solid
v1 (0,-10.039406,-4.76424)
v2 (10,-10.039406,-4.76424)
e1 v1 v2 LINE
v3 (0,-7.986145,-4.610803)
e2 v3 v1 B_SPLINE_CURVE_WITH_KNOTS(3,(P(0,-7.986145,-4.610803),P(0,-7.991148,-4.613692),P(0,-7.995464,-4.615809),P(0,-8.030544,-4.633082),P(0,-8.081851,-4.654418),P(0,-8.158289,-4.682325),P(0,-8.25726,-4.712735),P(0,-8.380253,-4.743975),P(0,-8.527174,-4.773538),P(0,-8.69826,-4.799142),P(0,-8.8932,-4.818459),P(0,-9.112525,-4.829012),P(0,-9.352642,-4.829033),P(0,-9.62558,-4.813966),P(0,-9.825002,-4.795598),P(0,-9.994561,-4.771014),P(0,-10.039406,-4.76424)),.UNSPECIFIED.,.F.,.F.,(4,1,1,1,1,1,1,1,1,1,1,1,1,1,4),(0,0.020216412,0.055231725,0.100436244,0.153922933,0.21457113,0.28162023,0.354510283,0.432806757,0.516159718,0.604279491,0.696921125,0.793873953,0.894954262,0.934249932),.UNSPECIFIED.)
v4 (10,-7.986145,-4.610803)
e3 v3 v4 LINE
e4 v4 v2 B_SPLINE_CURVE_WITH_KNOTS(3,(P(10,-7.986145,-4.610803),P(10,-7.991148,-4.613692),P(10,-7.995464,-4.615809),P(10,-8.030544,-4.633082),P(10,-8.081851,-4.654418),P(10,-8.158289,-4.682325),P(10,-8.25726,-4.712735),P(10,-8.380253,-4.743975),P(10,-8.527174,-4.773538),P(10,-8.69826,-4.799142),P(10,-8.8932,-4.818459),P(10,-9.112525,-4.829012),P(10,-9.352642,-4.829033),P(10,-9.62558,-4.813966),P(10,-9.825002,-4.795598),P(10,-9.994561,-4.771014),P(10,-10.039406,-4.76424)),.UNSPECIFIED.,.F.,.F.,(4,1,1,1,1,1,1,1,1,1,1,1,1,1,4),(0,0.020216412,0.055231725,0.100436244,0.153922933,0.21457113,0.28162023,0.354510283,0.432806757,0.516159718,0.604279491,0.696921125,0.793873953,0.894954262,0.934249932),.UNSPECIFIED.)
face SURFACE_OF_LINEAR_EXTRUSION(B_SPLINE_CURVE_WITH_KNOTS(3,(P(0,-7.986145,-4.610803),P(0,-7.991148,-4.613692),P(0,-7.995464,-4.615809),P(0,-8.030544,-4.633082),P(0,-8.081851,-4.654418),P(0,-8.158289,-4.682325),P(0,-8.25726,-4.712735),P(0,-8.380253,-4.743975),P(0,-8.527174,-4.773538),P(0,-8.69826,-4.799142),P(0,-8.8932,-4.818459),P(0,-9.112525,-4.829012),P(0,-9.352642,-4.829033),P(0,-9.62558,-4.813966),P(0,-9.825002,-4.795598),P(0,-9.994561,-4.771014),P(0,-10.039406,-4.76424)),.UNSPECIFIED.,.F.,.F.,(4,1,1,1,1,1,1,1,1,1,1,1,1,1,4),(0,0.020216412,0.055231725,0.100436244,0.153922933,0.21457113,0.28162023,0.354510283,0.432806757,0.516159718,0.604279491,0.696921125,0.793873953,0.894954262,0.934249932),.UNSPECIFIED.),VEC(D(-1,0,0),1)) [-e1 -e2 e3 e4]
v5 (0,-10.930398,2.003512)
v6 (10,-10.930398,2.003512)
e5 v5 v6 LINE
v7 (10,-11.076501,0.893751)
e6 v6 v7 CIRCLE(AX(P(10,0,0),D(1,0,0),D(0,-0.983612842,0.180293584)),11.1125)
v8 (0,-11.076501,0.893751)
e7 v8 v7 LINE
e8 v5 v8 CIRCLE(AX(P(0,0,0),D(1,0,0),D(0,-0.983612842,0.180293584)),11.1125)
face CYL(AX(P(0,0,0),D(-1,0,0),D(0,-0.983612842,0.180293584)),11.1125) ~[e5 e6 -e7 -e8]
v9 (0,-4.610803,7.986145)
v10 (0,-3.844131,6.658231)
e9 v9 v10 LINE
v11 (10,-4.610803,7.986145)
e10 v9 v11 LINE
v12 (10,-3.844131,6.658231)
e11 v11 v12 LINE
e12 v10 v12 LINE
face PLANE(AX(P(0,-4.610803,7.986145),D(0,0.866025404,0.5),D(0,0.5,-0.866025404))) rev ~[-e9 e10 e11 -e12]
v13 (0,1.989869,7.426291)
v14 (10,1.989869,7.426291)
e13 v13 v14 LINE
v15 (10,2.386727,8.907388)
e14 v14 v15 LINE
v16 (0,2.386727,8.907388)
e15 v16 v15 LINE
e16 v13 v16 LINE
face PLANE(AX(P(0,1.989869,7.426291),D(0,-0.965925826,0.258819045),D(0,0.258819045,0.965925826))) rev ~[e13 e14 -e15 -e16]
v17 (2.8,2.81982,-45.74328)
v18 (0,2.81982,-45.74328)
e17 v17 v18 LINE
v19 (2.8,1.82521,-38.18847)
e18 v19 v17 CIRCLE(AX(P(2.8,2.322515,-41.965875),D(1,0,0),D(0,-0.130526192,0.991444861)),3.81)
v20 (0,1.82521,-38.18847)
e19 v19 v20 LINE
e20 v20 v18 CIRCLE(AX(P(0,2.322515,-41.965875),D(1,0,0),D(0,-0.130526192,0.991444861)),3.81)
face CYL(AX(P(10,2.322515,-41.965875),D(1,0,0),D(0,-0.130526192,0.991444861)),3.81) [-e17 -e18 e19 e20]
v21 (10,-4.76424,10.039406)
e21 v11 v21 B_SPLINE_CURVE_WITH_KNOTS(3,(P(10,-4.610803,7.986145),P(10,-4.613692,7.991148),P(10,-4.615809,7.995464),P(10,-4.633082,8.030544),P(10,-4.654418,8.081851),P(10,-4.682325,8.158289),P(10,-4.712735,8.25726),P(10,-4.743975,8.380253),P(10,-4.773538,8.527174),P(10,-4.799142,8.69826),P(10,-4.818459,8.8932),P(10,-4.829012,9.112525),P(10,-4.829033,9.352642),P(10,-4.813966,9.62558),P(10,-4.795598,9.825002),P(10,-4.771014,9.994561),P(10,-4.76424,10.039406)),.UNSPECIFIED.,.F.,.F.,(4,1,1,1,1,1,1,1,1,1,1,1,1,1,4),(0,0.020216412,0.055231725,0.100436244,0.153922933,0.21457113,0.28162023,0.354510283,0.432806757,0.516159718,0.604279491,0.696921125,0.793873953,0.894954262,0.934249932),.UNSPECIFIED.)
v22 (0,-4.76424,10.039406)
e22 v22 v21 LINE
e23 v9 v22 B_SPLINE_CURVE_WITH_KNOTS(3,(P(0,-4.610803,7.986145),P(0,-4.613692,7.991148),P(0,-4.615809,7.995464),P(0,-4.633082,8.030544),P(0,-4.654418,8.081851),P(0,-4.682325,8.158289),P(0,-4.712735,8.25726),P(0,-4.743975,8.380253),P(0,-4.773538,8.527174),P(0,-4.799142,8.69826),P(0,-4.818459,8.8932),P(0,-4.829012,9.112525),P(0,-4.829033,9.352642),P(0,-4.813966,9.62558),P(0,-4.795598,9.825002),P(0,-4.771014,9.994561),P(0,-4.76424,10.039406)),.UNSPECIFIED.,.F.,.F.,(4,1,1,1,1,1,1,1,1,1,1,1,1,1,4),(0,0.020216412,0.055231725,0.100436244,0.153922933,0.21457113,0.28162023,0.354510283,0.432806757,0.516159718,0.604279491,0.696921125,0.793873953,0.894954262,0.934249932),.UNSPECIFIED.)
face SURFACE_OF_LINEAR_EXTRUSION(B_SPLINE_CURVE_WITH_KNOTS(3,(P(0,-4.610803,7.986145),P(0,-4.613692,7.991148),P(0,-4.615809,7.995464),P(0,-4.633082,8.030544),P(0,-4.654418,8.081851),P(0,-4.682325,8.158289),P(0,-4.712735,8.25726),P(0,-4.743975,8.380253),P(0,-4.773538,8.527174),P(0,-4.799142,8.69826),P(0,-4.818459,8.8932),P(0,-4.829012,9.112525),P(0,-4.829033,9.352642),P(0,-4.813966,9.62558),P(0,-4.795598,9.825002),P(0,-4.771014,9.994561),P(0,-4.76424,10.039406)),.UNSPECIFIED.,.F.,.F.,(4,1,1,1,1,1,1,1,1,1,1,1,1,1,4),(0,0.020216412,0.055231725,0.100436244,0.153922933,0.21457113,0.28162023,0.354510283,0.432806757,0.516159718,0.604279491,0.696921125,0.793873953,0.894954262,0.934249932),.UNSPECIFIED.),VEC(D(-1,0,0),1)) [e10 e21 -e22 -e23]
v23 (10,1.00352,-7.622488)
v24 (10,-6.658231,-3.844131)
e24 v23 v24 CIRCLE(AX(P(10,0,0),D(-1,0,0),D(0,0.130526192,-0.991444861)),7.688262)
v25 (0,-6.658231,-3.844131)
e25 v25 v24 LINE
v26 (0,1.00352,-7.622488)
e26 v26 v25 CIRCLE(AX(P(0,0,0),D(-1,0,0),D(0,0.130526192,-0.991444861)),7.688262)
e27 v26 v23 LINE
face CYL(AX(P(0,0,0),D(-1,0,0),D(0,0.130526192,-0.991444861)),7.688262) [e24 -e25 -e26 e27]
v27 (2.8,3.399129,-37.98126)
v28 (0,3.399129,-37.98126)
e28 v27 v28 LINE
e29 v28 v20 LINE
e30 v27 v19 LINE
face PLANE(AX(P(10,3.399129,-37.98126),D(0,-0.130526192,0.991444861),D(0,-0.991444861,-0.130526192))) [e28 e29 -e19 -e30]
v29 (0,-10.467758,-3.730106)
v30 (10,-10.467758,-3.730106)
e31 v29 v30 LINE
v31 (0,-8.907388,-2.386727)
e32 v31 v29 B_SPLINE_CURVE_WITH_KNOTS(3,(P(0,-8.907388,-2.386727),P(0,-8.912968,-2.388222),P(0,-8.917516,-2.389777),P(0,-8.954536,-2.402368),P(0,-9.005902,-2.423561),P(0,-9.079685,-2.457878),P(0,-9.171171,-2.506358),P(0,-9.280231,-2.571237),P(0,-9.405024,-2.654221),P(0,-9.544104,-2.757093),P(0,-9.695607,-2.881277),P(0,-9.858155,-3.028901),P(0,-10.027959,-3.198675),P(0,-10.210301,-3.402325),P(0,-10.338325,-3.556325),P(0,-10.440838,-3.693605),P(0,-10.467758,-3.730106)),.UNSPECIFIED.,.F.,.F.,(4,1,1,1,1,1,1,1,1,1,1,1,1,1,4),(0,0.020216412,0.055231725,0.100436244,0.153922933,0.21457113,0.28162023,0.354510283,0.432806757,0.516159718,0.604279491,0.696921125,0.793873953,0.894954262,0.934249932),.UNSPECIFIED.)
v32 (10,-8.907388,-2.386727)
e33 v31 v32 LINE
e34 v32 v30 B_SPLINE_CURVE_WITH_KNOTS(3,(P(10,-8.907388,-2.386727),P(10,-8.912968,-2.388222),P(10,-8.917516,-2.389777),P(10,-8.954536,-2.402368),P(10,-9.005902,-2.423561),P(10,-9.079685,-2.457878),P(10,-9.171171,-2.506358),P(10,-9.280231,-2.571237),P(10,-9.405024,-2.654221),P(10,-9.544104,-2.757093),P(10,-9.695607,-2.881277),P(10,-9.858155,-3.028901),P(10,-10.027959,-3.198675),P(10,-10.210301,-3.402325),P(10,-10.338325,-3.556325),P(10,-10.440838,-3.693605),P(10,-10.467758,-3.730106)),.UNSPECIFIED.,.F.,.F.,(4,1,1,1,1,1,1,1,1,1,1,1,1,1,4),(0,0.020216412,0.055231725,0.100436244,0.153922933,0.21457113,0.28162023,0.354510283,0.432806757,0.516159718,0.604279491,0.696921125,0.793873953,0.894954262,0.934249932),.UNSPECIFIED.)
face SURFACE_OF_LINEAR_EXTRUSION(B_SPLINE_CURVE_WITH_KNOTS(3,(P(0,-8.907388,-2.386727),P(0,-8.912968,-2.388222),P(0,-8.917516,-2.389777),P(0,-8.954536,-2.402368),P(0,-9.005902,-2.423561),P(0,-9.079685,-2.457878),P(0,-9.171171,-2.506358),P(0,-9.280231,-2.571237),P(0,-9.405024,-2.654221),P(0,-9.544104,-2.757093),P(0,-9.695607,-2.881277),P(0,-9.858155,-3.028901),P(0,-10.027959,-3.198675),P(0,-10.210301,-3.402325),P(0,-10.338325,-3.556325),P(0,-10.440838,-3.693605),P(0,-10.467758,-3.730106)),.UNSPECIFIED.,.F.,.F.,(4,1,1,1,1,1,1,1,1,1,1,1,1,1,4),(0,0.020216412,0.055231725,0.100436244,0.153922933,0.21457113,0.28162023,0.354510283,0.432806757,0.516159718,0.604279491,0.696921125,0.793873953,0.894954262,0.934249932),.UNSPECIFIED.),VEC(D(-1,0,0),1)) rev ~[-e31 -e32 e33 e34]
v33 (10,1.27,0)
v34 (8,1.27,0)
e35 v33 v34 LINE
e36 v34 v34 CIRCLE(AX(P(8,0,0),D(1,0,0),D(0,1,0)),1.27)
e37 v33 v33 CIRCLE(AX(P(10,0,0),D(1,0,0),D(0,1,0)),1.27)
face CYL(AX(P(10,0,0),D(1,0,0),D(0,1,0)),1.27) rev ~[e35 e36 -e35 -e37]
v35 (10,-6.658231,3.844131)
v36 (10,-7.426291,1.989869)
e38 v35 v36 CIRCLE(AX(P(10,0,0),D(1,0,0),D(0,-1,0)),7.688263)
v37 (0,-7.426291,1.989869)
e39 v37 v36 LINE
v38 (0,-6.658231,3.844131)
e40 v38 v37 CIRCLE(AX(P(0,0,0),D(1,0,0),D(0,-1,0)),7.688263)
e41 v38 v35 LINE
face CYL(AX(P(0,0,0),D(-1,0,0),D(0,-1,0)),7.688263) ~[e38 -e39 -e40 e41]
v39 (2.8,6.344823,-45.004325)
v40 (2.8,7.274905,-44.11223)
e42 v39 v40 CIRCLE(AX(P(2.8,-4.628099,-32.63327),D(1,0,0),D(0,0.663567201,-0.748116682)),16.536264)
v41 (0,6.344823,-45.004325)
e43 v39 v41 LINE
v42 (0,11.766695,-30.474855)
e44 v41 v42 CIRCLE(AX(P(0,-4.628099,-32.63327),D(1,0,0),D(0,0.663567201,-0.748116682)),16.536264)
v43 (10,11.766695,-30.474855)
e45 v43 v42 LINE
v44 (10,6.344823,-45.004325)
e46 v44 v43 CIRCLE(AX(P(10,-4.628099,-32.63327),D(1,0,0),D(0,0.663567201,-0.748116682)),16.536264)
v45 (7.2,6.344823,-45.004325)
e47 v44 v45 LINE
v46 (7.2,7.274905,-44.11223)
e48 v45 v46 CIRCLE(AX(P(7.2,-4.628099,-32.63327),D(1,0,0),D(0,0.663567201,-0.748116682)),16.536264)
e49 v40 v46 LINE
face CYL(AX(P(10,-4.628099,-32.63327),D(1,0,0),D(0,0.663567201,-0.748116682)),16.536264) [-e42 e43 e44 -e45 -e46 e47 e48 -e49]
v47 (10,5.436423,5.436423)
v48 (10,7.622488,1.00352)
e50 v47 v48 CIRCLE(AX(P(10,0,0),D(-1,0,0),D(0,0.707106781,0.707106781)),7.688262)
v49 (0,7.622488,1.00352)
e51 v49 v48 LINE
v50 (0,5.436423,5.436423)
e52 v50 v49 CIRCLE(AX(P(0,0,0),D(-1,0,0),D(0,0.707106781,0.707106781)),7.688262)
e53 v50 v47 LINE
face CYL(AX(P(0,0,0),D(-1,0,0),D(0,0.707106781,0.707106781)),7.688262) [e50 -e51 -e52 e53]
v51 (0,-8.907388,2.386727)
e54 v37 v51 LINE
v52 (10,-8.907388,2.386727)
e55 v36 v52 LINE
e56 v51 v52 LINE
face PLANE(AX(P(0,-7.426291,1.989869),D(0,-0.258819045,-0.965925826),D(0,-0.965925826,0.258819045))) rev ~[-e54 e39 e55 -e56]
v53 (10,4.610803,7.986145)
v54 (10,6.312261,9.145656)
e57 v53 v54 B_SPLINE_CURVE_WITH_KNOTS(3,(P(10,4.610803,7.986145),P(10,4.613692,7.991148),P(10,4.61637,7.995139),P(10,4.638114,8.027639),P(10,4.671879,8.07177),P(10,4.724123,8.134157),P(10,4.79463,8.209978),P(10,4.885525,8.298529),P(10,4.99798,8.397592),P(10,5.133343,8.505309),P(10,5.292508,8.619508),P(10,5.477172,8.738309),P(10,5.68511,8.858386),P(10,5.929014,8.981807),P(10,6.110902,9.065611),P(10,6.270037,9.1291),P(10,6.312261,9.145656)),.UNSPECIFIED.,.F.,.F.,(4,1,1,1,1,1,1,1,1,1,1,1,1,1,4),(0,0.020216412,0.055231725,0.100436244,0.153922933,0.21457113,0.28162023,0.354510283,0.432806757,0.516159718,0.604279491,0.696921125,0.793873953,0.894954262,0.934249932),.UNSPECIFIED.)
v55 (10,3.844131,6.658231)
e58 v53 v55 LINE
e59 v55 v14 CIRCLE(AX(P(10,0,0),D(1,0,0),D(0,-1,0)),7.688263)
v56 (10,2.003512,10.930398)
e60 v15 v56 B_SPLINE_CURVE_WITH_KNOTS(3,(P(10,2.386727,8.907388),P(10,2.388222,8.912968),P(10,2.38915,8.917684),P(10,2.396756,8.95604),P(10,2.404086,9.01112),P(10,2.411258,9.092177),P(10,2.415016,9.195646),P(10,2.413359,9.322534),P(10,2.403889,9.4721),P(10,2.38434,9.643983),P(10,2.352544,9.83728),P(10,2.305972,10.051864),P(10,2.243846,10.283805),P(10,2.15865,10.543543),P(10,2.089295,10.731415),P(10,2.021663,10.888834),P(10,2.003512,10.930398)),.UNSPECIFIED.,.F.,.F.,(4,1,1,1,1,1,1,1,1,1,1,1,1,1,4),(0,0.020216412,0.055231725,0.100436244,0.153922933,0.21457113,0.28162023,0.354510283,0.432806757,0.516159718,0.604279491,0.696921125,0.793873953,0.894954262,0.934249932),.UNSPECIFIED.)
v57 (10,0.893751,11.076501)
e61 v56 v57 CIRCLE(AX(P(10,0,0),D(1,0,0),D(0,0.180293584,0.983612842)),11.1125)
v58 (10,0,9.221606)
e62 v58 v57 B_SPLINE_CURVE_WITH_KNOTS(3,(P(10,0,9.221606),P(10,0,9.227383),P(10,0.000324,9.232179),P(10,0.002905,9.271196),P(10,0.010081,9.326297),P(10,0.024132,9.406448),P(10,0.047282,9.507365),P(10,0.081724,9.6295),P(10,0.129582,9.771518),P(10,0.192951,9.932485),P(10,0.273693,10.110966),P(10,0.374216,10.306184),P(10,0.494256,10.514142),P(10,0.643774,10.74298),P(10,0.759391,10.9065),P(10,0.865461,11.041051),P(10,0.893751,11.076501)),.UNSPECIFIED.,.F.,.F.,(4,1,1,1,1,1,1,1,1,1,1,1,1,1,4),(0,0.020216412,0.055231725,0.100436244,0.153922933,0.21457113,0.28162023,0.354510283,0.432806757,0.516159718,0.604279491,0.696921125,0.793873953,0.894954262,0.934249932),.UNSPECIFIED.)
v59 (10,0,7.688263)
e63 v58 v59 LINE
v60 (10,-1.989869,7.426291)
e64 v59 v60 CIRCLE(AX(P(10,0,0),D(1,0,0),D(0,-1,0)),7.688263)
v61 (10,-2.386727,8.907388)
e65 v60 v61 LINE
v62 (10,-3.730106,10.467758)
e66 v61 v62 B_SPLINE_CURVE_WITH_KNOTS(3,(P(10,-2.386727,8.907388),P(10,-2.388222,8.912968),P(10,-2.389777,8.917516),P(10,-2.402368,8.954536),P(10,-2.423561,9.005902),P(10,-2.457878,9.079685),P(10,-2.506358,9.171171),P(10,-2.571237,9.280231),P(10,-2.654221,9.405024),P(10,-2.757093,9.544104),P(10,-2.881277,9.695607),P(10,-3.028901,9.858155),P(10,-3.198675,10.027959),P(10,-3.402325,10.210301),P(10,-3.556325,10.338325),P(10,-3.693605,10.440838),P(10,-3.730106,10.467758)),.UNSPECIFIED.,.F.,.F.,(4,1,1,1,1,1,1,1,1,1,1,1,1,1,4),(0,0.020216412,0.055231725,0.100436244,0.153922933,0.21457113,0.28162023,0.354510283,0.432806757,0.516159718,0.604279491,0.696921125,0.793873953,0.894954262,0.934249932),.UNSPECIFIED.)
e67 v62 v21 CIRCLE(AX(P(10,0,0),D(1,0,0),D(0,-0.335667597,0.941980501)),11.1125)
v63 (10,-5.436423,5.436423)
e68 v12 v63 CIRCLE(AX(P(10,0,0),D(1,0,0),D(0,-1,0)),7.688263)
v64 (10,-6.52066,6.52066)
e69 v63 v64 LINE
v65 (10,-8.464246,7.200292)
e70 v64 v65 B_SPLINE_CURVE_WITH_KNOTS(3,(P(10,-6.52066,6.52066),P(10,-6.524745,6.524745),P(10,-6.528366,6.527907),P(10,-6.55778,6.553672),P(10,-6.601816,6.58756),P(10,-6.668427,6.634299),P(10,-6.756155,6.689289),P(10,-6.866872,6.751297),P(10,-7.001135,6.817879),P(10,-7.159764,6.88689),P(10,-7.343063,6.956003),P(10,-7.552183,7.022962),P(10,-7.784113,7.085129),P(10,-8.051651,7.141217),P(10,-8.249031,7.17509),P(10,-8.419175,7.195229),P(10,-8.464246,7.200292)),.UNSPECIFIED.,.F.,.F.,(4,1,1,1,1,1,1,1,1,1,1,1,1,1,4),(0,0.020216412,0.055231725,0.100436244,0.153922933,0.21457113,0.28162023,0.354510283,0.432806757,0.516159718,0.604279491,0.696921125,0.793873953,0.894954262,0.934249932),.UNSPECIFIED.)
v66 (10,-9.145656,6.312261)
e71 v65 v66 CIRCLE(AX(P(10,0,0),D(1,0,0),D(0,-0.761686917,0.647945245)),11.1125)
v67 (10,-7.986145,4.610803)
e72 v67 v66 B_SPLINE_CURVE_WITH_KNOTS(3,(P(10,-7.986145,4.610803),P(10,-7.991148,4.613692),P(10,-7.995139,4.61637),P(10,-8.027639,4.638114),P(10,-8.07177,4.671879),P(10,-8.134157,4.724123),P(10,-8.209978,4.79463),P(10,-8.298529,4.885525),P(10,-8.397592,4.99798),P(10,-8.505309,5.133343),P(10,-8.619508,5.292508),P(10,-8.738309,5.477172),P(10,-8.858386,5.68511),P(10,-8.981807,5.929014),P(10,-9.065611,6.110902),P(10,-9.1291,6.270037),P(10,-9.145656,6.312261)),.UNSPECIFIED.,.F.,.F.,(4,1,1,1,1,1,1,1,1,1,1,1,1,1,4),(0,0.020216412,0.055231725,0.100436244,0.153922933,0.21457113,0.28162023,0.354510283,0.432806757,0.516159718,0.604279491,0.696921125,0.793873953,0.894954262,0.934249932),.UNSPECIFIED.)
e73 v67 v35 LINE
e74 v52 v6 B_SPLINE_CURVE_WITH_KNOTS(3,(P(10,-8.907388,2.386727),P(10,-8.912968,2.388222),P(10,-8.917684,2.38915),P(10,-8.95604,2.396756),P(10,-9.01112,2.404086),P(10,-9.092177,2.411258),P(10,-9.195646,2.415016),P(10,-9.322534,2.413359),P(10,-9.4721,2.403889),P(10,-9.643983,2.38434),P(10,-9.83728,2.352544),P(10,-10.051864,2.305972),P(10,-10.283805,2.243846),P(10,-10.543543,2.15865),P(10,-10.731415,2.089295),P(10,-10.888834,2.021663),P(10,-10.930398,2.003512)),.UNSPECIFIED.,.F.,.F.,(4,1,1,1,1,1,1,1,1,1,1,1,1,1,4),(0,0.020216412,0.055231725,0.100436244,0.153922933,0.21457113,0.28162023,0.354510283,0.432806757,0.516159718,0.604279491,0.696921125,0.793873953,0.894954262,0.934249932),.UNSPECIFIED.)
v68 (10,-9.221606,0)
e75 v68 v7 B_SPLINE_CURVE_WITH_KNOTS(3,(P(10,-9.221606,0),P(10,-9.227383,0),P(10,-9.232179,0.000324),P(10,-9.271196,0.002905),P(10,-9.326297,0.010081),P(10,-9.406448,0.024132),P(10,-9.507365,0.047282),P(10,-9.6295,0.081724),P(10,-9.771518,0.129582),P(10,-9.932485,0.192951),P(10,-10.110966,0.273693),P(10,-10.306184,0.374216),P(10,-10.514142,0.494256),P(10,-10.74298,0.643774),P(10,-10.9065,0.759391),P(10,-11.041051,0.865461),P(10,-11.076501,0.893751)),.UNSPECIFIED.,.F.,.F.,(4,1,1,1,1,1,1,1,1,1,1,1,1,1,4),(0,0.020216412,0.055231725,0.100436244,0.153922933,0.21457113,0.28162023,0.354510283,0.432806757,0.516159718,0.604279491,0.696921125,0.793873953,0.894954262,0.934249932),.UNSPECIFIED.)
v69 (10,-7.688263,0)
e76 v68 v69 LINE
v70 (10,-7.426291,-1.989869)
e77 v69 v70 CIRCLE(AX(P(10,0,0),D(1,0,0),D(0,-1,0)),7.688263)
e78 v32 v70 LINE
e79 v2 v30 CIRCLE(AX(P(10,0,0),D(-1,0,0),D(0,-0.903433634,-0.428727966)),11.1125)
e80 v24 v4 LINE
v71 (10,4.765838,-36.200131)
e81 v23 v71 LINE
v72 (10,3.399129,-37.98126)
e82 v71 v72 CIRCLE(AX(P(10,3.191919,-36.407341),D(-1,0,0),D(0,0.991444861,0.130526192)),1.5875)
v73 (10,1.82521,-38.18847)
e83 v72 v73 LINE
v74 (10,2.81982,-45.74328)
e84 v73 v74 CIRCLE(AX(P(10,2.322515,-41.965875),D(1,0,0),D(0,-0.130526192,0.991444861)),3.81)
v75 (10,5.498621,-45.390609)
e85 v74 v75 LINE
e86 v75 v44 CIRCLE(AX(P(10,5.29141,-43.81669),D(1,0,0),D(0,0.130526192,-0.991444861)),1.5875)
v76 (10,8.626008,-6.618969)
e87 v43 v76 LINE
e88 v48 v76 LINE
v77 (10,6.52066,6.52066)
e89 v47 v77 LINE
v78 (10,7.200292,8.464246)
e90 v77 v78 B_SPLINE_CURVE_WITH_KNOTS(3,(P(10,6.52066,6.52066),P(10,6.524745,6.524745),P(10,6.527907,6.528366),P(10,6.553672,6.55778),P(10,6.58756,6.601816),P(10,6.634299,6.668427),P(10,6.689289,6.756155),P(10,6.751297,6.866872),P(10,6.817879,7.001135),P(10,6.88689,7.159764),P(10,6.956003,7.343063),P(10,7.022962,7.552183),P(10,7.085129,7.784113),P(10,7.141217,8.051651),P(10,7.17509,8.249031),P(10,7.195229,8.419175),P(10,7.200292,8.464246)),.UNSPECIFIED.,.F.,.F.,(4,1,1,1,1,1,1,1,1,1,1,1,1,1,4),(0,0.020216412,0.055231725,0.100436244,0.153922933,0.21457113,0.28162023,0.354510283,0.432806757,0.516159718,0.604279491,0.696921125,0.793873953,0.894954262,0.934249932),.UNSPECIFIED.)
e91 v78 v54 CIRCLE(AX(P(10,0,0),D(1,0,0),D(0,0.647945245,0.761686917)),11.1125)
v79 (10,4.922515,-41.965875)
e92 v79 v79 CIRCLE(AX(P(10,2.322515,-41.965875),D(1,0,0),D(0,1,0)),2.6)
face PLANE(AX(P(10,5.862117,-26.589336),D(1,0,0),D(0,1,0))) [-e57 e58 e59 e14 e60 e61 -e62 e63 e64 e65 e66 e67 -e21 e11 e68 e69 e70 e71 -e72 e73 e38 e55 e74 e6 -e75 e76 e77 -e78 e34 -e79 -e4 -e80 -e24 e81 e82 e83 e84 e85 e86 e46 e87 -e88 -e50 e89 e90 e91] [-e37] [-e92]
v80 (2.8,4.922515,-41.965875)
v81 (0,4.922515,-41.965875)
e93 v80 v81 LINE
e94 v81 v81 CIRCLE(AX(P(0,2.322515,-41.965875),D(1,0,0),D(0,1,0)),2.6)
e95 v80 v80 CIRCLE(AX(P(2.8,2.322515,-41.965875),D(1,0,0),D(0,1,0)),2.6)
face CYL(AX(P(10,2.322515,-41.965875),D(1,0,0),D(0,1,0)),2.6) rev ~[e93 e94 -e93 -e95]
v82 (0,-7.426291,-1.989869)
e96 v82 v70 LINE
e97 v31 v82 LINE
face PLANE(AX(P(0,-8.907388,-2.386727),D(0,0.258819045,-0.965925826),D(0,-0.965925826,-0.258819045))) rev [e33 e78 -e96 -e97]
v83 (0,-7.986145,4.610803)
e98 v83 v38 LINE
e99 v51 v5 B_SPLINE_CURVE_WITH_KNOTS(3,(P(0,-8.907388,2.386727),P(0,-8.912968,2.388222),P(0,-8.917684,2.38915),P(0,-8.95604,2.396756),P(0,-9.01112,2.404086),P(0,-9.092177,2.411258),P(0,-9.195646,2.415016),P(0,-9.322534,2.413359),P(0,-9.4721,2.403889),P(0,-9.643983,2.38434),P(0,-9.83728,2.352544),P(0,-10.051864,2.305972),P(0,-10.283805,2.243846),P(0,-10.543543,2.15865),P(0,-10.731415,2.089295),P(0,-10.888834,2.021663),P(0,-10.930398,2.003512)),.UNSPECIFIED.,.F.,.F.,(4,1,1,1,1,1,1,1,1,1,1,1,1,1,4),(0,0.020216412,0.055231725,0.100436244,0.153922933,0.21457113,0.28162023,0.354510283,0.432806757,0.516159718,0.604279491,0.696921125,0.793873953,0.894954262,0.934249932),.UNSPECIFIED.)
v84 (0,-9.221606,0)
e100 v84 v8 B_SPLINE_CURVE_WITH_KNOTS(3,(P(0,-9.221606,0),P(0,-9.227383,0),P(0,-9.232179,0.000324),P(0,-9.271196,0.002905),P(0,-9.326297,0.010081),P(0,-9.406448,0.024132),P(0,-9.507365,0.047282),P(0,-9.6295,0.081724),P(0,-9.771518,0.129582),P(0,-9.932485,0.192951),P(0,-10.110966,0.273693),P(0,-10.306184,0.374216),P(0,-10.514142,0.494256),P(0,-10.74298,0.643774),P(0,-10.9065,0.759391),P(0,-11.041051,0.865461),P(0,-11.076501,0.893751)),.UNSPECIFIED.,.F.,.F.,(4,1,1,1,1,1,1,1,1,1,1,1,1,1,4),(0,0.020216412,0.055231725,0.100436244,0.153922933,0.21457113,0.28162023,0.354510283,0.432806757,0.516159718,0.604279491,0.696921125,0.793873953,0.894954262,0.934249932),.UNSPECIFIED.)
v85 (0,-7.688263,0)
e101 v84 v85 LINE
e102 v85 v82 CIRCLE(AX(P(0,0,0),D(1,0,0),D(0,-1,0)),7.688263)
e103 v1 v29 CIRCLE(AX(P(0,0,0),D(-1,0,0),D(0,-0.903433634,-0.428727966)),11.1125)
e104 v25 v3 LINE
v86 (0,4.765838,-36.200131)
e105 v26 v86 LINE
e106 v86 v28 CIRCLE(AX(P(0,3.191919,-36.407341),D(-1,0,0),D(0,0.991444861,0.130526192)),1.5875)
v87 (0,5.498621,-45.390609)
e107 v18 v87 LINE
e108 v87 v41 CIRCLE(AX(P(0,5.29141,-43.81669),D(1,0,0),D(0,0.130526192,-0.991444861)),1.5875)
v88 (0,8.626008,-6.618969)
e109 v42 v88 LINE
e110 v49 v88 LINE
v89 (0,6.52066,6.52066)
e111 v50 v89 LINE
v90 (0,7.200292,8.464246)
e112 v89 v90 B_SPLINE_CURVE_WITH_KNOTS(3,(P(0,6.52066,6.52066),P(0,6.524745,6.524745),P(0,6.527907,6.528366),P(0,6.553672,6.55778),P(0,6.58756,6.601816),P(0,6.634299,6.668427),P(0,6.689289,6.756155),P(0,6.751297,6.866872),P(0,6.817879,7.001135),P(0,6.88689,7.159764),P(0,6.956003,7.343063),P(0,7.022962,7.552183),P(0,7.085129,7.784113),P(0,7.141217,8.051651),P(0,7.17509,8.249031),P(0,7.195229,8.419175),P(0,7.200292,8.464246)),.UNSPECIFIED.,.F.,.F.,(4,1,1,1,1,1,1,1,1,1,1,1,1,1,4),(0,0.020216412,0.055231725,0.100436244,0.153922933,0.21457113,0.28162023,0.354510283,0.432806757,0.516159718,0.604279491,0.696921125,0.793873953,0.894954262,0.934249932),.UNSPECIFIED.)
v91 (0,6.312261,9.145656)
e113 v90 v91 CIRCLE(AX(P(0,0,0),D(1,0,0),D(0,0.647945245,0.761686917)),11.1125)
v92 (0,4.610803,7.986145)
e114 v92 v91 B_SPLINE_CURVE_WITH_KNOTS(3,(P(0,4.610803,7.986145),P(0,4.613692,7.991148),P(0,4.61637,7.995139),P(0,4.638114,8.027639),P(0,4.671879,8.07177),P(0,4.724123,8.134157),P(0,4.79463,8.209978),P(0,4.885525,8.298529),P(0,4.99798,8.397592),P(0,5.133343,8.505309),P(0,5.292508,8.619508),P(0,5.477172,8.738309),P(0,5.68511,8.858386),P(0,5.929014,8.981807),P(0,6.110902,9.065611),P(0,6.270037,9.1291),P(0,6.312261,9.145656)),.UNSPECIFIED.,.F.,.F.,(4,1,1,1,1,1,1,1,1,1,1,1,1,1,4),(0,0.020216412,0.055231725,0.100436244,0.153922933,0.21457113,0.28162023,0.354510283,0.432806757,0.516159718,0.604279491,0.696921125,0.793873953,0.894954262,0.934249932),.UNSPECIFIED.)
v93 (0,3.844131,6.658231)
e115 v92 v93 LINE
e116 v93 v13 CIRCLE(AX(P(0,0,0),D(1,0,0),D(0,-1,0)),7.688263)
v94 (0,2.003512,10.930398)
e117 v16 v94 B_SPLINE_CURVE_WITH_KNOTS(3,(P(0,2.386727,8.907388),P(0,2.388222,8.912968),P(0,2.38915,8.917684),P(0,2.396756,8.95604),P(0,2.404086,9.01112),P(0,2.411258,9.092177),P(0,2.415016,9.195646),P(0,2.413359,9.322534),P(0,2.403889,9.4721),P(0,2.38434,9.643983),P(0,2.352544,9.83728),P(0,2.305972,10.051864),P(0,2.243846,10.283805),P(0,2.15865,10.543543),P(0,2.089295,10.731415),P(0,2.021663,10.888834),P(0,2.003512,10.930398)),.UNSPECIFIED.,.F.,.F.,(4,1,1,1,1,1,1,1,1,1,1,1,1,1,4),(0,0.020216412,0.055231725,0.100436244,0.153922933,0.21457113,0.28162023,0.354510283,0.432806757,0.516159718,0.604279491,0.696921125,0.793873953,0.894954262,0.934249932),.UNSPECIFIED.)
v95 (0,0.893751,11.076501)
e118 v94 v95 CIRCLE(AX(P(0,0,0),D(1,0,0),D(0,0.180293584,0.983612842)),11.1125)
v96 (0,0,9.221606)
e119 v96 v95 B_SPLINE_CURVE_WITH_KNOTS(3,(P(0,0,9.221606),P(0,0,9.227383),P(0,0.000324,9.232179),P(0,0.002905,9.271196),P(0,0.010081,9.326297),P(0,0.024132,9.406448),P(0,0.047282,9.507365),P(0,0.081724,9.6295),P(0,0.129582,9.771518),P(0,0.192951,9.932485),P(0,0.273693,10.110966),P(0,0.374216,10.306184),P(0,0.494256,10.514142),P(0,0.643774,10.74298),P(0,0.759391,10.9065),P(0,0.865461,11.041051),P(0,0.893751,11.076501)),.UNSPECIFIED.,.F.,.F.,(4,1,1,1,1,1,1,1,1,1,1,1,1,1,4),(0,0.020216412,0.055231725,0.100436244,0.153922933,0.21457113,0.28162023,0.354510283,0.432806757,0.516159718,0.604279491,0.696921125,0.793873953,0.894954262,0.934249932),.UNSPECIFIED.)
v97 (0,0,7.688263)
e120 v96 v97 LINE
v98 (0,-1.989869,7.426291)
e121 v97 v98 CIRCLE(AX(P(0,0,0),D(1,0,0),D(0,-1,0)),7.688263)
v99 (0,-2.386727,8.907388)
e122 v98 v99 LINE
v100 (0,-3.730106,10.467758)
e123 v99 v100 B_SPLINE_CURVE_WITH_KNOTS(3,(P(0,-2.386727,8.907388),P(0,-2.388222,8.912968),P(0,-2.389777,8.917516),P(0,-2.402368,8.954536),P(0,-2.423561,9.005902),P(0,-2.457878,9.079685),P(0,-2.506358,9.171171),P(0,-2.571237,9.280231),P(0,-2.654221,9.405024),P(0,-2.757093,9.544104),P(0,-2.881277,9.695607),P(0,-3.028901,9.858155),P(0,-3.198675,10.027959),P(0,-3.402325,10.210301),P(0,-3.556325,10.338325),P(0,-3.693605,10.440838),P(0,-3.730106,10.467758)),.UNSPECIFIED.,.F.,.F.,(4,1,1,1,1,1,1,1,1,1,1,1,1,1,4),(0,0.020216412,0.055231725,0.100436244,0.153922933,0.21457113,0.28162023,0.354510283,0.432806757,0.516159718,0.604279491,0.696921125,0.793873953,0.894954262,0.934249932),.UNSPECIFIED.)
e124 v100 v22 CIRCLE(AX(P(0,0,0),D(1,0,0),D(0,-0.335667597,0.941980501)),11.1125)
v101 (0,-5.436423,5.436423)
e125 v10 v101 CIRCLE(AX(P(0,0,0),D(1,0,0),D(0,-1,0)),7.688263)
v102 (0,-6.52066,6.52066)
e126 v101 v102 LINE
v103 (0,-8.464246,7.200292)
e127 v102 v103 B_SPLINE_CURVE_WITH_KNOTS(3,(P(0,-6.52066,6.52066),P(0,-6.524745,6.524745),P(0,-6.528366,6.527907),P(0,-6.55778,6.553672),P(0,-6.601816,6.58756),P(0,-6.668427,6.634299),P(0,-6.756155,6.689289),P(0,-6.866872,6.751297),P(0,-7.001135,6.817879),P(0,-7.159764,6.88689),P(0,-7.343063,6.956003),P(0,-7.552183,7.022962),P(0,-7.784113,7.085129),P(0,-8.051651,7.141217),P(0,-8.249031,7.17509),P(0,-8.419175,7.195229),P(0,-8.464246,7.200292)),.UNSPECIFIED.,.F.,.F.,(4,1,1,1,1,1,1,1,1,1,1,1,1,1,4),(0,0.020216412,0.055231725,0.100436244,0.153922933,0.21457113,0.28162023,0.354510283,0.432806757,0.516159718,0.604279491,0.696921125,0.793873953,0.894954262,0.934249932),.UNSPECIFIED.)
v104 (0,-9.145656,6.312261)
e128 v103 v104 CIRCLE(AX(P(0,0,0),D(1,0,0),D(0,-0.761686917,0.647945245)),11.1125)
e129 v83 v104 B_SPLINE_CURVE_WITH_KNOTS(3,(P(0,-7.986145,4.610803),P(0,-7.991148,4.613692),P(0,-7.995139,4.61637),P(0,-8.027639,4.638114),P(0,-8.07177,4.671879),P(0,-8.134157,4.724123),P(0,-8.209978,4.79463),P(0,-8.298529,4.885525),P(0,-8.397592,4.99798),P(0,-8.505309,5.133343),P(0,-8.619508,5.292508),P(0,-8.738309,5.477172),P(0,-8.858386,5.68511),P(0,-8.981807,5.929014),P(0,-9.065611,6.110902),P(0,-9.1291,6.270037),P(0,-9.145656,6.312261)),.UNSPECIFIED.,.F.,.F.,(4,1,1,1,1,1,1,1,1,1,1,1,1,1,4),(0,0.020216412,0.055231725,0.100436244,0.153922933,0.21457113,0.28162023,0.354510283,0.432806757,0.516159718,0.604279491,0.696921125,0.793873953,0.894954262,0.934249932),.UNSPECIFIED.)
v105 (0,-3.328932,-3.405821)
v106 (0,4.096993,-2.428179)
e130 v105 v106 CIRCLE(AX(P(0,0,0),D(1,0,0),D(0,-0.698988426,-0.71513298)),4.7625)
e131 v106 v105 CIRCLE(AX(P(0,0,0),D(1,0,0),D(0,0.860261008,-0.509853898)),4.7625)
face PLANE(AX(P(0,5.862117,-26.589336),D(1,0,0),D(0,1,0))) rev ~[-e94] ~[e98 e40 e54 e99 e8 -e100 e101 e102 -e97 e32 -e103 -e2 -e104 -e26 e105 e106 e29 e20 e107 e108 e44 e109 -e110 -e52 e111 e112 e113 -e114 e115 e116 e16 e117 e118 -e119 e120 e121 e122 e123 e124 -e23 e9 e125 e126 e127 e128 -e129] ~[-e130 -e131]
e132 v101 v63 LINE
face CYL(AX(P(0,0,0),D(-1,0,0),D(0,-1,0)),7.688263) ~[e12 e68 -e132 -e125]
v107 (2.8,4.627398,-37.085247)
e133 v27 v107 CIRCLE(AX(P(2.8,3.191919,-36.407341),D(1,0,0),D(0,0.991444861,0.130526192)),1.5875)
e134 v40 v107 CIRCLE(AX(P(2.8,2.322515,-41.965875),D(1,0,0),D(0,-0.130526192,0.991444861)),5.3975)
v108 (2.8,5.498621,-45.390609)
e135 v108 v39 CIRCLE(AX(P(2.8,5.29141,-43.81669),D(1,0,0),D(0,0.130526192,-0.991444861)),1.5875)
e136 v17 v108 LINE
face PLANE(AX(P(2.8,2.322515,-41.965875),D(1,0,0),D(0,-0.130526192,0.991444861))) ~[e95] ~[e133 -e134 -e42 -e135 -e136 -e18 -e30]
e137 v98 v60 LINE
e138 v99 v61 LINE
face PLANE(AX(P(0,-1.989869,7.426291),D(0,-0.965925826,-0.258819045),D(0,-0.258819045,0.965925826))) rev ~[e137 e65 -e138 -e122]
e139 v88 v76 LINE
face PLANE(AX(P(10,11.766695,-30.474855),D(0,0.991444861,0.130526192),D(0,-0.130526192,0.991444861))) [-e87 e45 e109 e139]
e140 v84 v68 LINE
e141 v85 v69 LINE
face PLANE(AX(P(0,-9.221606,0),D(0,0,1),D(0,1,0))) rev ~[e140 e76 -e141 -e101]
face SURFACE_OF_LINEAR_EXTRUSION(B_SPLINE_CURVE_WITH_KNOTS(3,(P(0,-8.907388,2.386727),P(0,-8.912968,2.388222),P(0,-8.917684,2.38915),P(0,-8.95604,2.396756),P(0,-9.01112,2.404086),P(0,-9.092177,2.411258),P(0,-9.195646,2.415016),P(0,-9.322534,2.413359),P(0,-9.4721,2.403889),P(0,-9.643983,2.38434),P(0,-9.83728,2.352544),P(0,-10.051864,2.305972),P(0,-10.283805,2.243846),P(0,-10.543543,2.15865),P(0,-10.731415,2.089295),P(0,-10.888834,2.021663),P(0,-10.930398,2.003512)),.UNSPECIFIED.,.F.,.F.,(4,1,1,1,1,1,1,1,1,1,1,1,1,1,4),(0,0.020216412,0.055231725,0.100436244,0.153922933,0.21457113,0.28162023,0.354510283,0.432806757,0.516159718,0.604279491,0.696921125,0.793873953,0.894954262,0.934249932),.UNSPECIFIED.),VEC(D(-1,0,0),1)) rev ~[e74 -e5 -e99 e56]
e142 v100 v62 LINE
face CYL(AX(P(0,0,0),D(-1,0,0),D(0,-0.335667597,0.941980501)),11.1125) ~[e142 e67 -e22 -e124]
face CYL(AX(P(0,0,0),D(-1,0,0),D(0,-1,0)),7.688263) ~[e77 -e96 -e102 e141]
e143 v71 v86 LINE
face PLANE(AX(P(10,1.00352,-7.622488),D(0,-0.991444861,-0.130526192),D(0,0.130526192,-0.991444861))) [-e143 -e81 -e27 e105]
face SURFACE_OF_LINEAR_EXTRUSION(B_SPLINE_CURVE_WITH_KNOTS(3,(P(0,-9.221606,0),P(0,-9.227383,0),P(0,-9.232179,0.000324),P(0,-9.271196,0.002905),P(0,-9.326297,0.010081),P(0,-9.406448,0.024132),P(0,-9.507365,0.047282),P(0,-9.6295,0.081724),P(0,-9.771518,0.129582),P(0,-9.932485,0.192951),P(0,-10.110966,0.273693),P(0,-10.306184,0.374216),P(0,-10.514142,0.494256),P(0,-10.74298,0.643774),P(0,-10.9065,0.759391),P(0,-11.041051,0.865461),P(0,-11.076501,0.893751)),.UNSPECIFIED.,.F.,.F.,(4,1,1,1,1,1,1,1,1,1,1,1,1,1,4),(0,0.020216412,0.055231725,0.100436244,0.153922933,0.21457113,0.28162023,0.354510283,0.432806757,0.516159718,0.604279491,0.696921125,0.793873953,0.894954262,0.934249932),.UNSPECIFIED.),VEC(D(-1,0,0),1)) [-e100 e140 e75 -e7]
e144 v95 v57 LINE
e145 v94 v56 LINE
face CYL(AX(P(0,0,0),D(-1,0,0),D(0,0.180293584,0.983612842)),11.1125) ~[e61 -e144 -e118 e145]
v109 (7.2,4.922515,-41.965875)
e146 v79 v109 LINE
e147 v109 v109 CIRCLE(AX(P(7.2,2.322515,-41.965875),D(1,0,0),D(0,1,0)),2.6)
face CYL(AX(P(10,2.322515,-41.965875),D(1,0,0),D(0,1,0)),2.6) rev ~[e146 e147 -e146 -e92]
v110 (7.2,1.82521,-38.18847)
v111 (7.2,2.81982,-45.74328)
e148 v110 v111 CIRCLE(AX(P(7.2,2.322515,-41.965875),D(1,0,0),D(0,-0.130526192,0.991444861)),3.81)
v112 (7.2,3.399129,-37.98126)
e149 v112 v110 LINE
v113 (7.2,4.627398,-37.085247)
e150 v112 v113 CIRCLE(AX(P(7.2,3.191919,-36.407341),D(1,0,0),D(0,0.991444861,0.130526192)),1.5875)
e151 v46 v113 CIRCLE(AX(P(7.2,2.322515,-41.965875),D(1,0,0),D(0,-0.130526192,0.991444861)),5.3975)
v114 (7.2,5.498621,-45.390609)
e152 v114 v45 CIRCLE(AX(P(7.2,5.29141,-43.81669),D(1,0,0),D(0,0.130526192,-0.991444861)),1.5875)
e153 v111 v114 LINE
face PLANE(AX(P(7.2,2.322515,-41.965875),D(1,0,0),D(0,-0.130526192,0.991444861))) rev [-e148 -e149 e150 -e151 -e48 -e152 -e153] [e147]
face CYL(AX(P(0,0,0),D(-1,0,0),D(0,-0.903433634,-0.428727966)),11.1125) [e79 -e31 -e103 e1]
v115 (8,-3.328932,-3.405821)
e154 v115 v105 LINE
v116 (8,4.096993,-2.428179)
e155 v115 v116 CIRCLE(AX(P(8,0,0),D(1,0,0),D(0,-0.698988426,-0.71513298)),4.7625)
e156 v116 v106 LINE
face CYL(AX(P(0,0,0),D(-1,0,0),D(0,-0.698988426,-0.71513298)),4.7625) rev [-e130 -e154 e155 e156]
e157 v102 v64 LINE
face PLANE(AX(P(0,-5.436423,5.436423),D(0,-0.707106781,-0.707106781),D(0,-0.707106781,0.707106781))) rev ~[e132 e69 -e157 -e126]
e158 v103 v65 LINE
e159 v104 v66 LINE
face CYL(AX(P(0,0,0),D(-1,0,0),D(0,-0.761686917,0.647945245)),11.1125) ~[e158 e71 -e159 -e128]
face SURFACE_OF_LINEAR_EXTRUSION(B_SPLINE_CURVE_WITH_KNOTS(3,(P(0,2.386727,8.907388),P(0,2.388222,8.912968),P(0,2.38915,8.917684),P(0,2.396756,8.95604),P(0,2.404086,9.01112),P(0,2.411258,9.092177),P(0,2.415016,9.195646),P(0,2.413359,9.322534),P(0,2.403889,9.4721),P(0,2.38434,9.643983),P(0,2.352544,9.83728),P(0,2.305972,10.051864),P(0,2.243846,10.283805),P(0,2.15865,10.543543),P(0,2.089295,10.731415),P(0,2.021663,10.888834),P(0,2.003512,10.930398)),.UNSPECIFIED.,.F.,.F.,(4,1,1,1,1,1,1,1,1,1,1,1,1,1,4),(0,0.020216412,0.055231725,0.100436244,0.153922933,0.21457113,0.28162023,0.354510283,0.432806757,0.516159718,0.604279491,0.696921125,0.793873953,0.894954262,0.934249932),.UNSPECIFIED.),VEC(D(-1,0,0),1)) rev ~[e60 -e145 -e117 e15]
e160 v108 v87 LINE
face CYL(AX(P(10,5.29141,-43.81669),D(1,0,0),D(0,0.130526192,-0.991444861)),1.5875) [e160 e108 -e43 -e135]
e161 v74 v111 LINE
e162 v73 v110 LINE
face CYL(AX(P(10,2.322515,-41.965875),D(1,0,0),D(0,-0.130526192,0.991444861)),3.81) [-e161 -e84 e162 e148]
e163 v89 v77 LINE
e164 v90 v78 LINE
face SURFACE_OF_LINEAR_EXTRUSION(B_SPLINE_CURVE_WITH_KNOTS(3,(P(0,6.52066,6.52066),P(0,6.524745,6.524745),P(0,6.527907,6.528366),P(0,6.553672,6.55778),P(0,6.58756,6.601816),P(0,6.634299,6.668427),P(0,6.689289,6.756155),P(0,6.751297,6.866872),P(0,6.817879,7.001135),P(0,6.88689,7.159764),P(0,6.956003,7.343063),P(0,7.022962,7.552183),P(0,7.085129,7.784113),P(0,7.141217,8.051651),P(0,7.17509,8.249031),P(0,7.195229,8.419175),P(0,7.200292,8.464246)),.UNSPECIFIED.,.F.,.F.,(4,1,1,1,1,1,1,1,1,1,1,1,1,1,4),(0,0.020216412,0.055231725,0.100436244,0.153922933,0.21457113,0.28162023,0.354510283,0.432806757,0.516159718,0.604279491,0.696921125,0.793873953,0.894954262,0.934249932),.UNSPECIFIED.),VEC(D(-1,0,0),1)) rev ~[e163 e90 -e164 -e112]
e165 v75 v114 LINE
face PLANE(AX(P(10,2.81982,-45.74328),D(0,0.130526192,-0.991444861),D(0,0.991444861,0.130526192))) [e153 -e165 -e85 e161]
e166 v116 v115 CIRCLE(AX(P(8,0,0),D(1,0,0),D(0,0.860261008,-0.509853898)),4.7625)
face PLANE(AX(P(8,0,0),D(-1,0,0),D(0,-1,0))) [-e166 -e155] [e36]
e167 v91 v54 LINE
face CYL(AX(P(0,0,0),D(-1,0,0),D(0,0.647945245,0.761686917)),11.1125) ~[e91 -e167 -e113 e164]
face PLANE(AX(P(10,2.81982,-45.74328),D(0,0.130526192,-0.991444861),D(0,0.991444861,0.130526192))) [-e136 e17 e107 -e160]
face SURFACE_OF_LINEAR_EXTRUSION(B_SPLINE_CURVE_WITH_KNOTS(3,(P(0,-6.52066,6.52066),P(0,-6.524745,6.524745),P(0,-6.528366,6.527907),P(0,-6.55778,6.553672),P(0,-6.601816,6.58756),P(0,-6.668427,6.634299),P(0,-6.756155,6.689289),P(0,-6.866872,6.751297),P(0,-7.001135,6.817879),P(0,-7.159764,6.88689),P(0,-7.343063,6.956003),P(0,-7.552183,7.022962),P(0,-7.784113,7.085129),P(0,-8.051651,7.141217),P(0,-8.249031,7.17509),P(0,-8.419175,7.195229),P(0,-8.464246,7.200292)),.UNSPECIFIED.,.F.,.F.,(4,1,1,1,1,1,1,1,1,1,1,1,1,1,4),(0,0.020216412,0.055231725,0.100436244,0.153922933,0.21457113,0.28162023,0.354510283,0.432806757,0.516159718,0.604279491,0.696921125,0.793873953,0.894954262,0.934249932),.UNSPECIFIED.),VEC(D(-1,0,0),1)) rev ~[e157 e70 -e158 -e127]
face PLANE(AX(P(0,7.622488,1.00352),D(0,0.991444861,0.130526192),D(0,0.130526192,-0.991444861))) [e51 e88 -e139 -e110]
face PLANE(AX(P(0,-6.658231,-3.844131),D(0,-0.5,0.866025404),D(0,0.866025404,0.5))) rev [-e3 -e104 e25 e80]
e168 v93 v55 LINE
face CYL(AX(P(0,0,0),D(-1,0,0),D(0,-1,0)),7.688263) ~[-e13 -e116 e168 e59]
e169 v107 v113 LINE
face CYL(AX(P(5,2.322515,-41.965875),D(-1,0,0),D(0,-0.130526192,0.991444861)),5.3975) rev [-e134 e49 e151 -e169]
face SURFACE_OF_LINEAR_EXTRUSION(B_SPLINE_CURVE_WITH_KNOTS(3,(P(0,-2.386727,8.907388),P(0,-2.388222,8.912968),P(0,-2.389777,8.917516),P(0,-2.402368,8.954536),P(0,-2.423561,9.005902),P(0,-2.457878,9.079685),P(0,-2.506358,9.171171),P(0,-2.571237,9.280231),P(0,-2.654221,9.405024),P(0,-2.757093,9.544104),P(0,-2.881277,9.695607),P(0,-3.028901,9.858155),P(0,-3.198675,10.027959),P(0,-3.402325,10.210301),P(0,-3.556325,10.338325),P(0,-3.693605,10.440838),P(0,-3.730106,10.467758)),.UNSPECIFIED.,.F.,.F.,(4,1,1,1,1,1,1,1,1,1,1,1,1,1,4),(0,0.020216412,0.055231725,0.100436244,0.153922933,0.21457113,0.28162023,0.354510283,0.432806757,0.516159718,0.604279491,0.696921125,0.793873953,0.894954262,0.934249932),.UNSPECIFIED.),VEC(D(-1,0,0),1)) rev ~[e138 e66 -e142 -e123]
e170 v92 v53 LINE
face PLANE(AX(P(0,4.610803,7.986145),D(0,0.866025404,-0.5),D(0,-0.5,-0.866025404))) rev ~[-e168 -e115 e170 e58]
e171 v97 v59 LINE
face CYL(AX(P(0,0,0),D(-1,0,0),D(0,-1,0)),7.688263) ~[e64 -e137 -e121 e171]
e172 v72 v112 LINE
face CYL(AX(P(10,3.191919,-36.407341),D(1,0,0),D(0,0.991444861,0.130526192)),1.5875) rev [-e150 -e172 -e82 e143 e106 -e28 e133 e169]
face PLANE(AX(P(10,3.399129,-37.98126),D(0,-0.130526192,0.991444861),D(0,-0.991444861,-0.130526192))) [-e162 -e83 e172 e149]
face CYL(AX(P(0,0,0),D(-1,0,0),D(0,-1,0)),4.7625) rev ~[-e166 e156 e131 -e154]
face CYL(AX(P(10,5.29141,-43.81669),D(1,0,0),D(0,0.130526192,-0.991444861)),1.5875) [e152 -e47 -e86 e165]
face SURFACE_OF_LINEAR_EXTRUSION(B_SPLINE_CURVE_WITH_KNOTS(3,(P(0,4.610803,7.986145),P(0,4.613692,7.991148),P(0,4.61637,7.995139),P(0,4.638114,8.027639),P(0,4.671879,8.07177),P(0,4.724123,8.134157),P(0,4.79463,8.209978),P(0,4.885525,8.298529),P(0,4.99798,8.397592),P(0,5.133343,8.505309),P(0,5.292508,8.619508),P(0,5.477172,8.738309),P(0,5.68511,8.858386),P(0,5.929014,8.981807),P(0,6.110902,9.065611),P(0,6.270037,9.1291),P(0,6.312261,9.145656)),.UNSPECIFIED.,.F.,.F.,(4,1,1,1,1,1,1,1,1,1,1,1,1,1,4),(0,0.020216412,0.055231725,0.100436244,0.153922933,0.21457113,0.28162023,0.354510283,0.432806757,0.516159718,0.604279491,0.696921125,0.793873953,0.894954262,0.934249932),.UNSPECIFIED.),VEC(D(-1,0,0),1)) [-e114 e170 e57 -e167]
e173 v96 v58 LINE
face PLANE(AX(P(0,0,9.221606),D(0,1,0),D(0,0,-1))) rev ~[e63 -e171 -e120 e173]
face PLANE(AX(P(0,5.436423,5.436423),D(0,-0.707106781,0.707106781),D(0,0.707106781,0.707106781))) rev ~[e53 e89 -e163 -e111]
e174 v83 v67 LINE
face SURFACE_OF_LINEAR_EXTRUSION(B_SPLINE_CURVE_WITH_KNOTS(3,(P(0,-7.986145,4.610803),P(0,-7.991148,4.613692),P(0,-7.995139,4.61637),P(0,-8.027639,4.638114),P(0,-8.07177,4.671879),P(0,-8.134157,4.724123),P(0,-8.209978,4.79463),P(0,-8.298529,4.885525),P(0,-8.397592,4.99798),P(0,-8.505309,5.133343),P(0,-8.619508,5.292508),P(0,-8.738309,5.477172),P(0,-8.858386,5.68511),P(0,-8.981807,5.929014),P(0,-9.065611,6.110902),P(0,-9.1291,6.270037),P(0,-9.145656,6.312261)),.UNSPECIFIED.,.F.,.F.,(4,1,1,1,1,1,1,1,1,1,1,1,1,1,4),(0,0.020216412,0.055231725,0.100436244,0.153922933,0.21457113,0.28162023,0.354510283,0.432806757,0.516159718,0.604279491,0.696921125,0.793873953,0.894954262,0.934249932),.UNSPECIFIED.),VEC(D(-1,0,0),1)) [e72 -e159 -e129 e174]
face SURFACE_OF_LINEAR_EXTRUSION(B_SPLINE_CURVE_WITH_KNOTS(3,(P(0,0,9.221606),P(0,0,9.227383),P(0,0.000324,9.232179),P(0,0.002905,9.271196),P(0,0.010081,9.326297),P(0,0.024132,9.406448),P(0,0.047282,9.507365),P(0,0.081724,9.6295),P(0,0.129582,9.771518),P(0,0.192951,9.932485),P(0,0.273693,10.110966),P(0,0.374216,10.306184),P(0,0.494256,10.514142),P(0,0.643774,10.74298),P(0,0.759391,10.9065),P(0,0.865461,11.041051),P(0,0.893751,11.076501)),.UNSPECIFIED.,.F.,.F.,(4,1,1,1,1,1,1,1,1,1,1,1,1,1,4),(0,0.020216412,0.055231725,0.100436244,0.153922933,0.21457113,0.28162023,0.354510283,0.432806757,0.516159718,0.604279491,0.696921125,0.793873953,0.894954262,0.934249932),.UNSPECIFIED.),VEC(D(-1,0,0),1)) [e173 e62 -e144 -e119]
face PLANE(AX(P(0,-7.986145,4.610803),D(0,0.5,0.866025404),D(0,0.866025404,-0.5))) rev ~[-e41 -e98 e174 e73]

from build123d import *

# Parameters (mm, degrees)
F3_DEPTH        = 10
F3_COPIES_COUNT = 5
F3_COPIES_ANGLE = 120
F5_R            = 4.7625
F6_DEPTH        = 8
F7_R            = 1.27
F8_DEPTH        = 25.4
F10_DEPTH       = 25.4
F12_DEPTH       = 10
F15_DEPTH       = 2
F17_R           = 2.6
F18_DEPTH       = 10
F20_W           = 4.4
F20_H           = 5.3975


# Not quite as in the source:
# - a feature of the source that left no trace in its solid (it failed there, or was rolled back) is left out
# - a pattern or mirror of a feature is missing from the dataset's text; its kind, count and spacing are read off the source's solid
# - a feature names something its author has since deleted; it is built from what else it names


with BuildPart() as f3:
    # F2 (on Right) → F3 (new body)
    with BuildSketch(Plane.YZ):
        with BuildLine():
            ThreePointArc((-7.6882625, 0), (0, -7.6882625), (7.6882625, 0))
            ThreePointArc((7.6882625, 0), (1.0035196289, 7.6224883485), (-7.426291308, 1.9898687587))
            ThreePointArc((-7.426291308, 1.9898687587), (-7.6224883485, 1.0035196289), (-7.6882625, 0))
        make_face()
        with BuildLine():
            ThreePointArc((-7.6882625, 0), (-7.6224883485, 1.0035196289), (-7.426291308, 1.9898687587))
            Line((-7.426291308, 1.9898687587), (-8.9073876605, 2.3867273303))
            add(Edge.make_bspline(
                [(-8.9073876605, 2.3867273303), (-8.9129675505, 2.3882224573), (-8.9176841258, 2.3891504576), (-8.9560398208, 2.3967560952), (-9.0111204055, 2.4040860623), (-9.0921767557, 2.4112581523), (-9.1956464181, 2.4150161111), (-9.3225341112, 2.4133585936), (-9.4721001001, 2.4038885647), (-9.6439830376, 2.3843397936), (-9.8372804848, 2.3525439817), (-10.0518635466, 2.3059720142), (-10.2838045034, 2.2438455399), (-10.5435425365, 2.158650335), (-10.7314150502, 2.0892946498), (-10.888833847, 2.0216630994), (-10.9303977099, 2.003512454)],
                knots=[0, 0, 0, 0, 0.0202164122, 0.055231725, 0.1004362437, 0.1539229332, 0.2145711301, 0.2816202297, 0.3545102827, 0.4328067574, 0.5161597183, 0.6042794907, 0.6969211254, 0.7938739525, 0.8949542617, 0.934249932, 0.934249932, 0.934249932, 0.934249932], degree=3))
            ThreePointArc((-10.9303977099, 2.003512454), (-11.017431022, 1.450472311), (-11.0765006198, 0.8937506752))
            add(Edge.make_bspline(
                [(-9.2216062746, 0), (-9.2273830018, 0), (-9.2321790478, 0.0003243601), (-9.2711962881, 0.0029050627), (-9.3262971825, 0.0100807624), (-9.406447878, 0.0241319827), (-9.5073645284, 0.0472819925), (-9.6294996312, 0.081723983), (-9.7715182587, 0.1295818548), (-9.9324848329, 0.1929510955), (-10.1109664676, 0.273692552), (-10.3061840768, 0.3742158014), (-10.5141423223, 0.4942561043), (-10.742979855, 0.6437735028), (-10.9065001958, 0.7593909349), (-11.0410507439, 0.8654609788), (-11.0765006198, 0.8937506752)],
                knots=[0, 0, 0, 0, 0.0202164122, 0.055231725, 0.1004362437, 0.1539229332, 0.2145711301, 0.2816202297, 0.3545102827, 0.4328067574, 0.5161597183, 0.6042794907, 0.6969211254, 0.7938739525, 0.8949542617, 0.934249932, 0.934249932, 0.934249932, 0.934249932], degree=3))
            Line((-9.2216062746, 0), (-7.6882625, 0))
        make_face()
    extrude(amount=F3_DEPTH)

    # F3_copies: F3 ×5 about axis
    f3_copies_axis = Axis((0, 0, 0), (-1, 0, 0))


with BuildPart() as f3_1:
    add(f3.part)
    for i in range(1, F3_COPIES_COUNT):
        add(f3.part.rotate(f3_copies_axis, i * F3_COPIES_ANGLE / (F3_COPIES_COUNT - 1)))

    # F3_copies1: F3 across plane


with BuildPart() as f3_2:
    add(f3_1.part)
    add(f3_1.part.mirror(Plane(origin=(0, 0, 0), x_dir=(0, -0.9914448614, -0.1305261922), z_dir=(0, 0.1305261922, -0.9914448614))))

    # F5 (on face) → F6 (cut)
    with BuildSketch(Plane(origin=(0, 0, 0), x_dir=(0, -1, 0), z_dir=(-1, 0, 0))):
        Circle(F5_R)
    extrude(amount=-F6_DEPTH, mode=Mode.SUBTRACT)

    # F7 (on face) → F8 (cut)
    with BuildSketch(Plane.YZ.offset(10)):
        Circle(F7_R)
    extrude(amount=-F8_DEPTH, mode=Mode.SUBTRACT)

    # F9 (on face) → F10 (cut)
    with BuildSketch(Plane.YZ.offset(10)):
        with BuildLine():
            Line((5.4364225493, 5.4364225493), (6.4313569287, -2.1208543547))
            Line((6.4313569287, -2.1208543547), (-6.658230636, -3.84413125))
            ThreePointArc((-6.658230636, -3.84413125), (-1.0393271028, -17.0218990639), (10.0434558029, -7.9445886398))
            ThreePointArc((10.0434558029, -7.9445886398), (14.9426168475, 1.225772556), (5.4364225493, 5.4364225493))
        make_face()
    extrude(amount=-F10_DEPTH, mode=Mode.SUBTRACT)

    # F11 (on face) → F12 (join)
    with BuildSketch(Plane(origin=(0, 0, 0), x_dir=(0, -1, 0), z_dir=(-1, 0, 0))):
        with BuildLine():
            ThreePointArc((3.3289323807, -3.4058208195), (-0.6216309904, -4.7217561523), (-4.0969930528, -2.4281791893))
            Line((-4.0969930528, -2.4281791893), (-6.4313569287, -2.1208543547))
            Line((-6.4313569287, -2.1208543547), (-5.4364225493, 5.4364225493))
            ThreePointArc((-5.4364225493, 5.4364225493), (-6.895393066, 3.4004315512), (-7.6224883485, 1.0035196289))
            Line((-7.6224883485, 1.0035196289), (-8.6260079774, -6.6189687196))
            Line((-8.6260079774, -6.6189687196), (-1.0035196289, -7.6224883485))
            ThreePointArc((-1.0035196289, -7.6224883485), (3.4004315512, -6.895393066), (6.658230636, -3.84413125))
            Line((6.658230636, -3.84413125), (3.3289323807, -3.4058208195))
        make_face()
    extrude(amount=-F12_DEPTH)

    # F13: union 

    # F14 (on face) → F15 (join)
    with BuildSketch(Plane.YZ.offset(10)):
        with BuildLine():
            Line((4.0969930528, -2.4281791893), (-3.3289323807, -3.4058208195))
            ThreePointArc((-3.3289323807, -3.4058208195), (0.6216309904, -4.7217561523), (4.0969930528, -2.4281791893))
        make_face()
    extrude(amount=-F15_DEPTH)

    # F16: union 

    # F17 (on face) → F18 (join)
    with BuildSketch(Plane.YZ.offset(10)):
        with BuildLine():
            Line((11.7666949515, -30.4748547197), (8.6260079774, -6.6189687196))
            Line((8.6260079774, -6.6189687196), (1.0035196289, -7.6224883485))
            Line((1.0035196289, -7.6224883485), (4.7658375934, -36.2001305009))
            ThreePointArc((4.7658375934, -36.2001305009), (4.4513673037, -37.3737495996), (3.3991292062, -37.9812595485))
            Line((3.3991292062, -37.9812595485), (1.8252104887, -38.1884698786))
            ThreePointArc((1.8252104887, -38.1884698786), (-1.4548896408, -42.4631795928), (2.8198200734, -45.7432797223))
            Line((2.8198200734, -45.7432797223), (5.4986207311, -45.3906089252))
            ThreePointArc((5.4986207311, -45.3906089252), (5.9506497242, -45.2608369332), (6.3448233333, -45.0043254397))
            ThreePointArc((6.3448233333, -45.0043254397), (10.8646203429, -38.4145914885), (11.7666949515, -30.4748547197))
        make_face()
        with Locations((2.3225152811, -41.9658748005)):
            Circle(F17_R, mode=Mode.SUBTRACT)
    extrude(amount=-F18_DEPTH)

    # F20 (on face) → F21 (revolve, cut)
    with BuildSketch(Plane(origin=(0, -3.1478374349, -0.4144206603), x_dir=(-1, 0, 0), z_dir=(0, 0.9914448614, 0.1305261922))):
        with Locations((-5, -39.21125)):
            Rectangle(F20_W, F20_H)
    revolve(axis=Axis((5.7694689557, 2.3225152811, -41.9658748005), (1, 0, 0)), mode=Mode.SUBTRACT)


solid = f3_2.part
